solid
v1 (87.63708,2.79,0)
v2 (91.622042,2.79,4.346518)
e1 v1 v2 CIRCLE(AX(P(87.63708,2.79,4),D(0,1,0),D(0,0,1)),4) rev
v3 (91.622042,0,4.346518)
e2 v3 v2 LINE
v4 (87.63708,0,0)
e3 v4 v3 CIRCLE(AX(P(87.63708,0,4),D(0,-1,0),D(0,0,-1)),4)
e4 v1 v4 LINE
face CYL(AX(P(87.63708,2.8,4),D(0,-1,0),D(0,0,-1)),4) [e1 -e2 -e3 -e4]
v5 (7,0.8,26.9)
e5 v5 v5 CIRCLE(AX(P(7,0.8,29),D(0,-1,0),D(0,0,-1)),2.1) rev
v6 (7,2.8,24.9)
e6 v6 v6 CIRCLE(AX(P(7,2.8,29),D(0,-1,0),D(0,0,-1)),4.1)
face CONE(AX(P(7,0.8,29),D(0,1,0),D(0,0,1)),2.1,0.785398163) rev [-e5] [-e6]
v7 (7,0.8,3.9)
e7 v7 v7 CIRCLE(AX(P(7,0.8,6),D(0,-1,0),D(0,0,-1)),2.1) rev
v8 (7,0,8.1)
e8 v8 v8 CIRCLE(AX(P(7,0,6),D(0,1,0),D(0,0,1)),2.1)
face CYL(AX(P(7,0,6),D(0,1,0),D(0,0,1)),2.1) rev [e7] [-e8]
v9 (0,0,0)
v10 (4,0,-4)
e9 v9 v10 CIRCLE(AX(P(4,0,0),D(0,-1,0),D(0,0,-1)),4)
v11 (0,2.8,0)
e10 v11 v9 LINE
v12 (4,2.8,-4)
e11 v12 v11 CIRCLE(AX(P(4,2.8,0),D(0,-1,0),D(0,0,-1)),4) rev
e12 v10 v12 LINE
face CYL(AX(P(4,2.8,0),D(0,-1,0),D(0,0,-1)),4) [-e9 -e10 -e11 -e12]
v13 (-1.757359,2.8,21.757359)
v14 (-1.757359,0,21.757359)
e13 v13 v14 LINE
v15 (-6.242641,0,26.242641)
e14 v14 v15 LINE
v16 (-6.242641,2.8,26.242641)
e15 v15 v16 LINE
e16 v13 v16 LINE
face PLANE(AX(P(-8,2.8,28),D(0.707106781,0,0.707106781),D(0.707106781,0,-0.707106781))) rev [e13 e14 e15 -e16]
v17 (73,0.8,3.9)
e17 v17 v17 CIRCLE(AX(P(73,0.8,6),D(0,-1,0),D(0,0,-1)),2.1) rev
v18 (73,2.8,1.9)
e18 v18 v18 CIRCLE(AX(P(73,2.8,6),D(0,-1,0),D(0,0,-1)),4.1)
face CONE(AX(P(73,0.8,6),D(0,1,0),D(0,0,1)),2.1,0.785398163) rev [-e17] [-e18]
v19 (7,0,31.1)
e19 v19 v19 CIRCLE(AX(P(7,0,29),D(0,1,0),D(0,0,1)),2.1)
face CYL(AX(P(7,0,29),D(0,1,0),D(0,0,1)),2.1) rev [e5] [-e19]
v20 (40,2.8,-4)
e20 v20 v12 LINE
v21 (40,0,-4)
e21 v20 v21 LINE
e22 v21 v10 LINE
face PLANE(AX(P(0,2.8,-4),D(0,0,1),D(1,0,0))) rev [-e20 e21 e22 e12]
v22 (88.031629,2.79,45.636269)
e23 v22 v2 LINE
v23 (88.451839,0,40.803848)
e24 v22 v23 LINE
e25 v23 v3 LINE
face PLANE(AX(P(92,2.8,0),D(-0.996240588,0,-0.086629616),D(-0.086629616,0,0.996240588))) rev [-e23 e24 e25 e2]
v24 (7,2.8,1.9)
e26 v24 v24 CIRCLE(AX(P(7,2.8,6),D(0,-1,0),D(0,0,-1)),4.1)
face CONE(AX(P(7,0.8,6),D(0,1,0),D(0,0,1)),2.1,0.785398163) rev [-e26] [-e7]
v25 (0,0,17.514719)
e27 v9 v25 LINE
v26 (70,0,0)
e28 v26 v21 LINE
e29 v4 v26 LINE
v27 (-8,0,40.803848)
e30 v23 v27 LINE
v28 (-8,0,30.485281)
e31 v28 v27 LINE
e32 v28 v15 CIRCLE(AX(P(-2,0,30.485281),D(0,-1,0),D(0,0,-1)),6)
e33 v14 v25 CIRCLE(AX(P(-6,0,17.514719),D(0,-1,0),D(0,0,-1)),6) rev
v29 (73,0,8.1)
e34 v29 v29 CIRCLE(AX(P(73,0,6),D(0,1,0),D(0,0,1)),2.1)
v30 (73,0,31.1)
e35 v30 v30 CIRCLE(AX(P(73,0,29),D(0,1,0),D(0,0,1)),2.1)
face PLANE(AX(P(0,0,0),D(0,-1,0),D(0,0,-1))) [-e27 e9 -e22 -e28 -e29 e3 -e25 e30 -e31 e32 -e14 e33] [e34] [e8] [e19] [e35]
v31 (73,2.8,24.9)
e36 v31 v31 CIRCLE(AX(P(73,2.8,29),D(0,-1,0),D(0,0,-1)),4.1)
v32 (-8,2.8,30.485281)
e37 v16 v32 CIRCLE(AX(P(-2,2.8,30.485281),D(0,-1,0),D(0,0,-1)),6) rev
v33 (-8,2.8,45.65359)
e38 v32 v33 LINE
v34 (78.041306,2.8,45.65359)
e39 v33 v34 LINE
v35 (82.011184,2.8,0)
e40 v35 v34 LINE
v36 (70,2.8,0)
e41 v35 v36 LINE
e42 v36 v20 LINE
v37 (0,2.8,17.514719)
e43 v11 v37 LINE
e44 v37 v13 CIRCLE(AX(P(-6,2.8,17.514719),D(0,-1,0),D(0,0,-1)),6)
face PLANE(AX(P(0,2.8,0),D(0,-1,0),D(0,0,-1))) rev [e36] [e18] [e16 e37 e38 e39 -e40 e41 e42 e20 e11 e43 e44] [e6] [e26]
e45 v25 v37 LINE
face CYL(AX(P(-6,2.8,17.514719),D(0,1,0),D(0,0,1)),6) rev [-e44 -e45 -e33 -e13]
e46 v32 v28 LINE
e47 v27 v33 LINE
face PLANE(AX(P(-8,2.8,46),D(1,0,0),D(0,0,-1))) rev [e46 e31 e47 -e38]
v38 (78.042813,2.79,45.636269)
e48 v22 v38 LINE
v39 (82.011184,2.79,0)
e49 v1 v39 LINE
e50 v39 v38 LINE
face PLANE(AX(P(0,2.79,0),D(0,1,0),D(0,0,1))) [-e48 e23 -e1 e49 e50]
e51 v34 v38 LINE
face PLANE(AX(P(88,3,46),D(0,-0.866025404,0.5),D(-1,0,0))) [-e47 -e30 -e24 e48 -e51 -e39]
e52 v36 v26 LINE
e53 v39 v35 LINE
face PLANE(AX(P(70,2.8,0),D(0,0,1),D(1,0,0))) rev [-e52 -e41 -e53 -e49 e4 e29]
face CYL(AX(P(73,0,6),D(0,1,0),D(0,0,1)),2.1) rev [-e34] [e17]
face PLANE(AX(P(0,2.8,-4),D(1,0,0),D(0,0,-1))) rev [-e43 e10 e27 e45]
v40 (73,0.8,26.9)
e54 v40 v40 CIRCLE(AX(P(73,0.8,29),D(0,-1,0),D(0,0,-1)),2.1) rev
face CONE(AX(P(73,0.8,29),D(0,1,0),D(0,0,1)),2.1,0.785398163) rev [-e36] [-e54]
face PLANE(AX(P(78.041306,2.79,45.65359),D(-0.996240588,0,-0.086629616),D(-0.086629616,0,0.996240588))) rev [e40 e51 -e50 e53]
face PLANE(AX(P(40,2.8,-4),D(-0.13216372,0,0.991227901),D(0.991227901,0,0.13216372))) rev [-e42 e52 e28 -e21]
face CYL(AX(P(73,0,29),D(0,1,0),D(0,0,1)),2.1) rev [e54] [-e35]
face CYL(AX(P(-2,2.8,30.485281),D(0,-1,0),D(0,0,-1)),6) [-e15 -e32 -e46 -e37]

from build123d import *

# Parameters (mm, degrees)
BOSS_EXTRUDE1_DEPTH = 2.8
CHAMFER1_SIZE       = 3
CHAMFER1_SIZE_2     = 5.196152423
SKETCH2_R           = 2.1
CUT_EXTRUDE1_DEPTH  = 103.74283559
CHAMFER2_SIZE       = 2
FILLET1_R           = 6
FILLET2_R           = 4
CUT_EXTRUDE2_DEPTH  = 0.01


with BuildPart() as part:
    # Sketch1 → Boss-Extrude1 (new body)
    with BuildSketch(Plane(origin=(0, 0, 0), x_dir=(1, 0, 0), z_dir=(0, 1, 0))):
        Polygon((0, 4), (40, 4), (70, 0), (92, 0), (88, -46), (0, -46), (-8, -46), (-8, -28), (0, -20), align=None)
    extrude(amount=BOSS_EXTRUDE1_DEPTH)

    # Chamfer1
    # the kernel refuses this chamfer: 5.196152423, 3 mm, written as the material it takes off along each edge
    with BuildSketch(Plane(origin=(-21.442891912, 0, 46), x_dir=(0, 0.9983227437537926, 0.05789386240267091), z_dir=(1, 0, 0))) as chamfer1_piece_1:
        Polygon((CHAMFER1_SIZE * 0.998322743754, -CHAMFER1_SIZE * 0.0578938624027), (-CHAMFER1_SIZE_2 * 0.0578938623994, -CHAMFER1_SIZE_2 * 0.998322743697), (0, 0), align=None)
    extrude(amount=122.885783824, mode=Mode.SUBTRACT)

    # Sketch2 → Cut-Extrude1 (cut, through all)
    with BuildSketch(Plane(origin=(0, 2.8, 0), x_dir=(1, 0, 0), z_dir=(0, 1, 0))):
        with Locations(Location((7, -6, 0), (0, 0, 270))):
            Circle(SKETCH2_R)
        with Locations(Location((7, -29, 0), (0, 0, 270))):
            Circle(SKETCH2_R)
        with Locations(Location((73, -6, 0), (0, 0, 270))):
            Circle(SKETCH2_R)
        with Locations(Location((73, -29, 0), (0, 0, 270))):
            Circle(SKETCH2_R)
    extrude(amount=-CUT_EXTRUDE1_DEPTH, mode=Mode.SUBTRACT)

    # Chamfer2
    chamfer2_edges = [part.edges().sort_by_distance(p)[0] for p in [
        (7, 2.8, 26.9),
        (73, 2.8, 3.9),
        (73, 2.8, 26.9),
        (7, 2.8, 3.9),
    ]]
    chamfer(chamfer2_edges, length=CHAMFER2_SIZE)

    # Fillet1
    fillet1_edges = [part.edges().sort_by_distance(p)[0] for p in [
        (-8, 1.4, 28),
        (0, 1.4, 20),
    ]]
    fillet(fillet1_edges, radius=FILLET1_R)

    # Fillet2
    fillet2_edges = [part.edges().sort_by_distance(p)[0] for p in [
        (0, 1.4, -4),
        (92, 1.4, 0),
    ]]
    fillet(fillet2_edges, radius=FILLET2_R)

    # Sketch3 → Cut-Extrude2 (cut)
    with BuildSketch(Plane(origin=(0, 2.8, 0), x_dir=(1, 0, 0), z_dir=(0, 1, 0))):
        Polygon((78.041306422, -45.653589838), (82.011183799, 0), (92.341682138, 0.80141962), (88.030122623, -45.653589838), align=None)
    extrude(amount=-CUT_EXTRUDE2_DEPTH, mode=Mode.SUBTRACT)


solid = part.part
